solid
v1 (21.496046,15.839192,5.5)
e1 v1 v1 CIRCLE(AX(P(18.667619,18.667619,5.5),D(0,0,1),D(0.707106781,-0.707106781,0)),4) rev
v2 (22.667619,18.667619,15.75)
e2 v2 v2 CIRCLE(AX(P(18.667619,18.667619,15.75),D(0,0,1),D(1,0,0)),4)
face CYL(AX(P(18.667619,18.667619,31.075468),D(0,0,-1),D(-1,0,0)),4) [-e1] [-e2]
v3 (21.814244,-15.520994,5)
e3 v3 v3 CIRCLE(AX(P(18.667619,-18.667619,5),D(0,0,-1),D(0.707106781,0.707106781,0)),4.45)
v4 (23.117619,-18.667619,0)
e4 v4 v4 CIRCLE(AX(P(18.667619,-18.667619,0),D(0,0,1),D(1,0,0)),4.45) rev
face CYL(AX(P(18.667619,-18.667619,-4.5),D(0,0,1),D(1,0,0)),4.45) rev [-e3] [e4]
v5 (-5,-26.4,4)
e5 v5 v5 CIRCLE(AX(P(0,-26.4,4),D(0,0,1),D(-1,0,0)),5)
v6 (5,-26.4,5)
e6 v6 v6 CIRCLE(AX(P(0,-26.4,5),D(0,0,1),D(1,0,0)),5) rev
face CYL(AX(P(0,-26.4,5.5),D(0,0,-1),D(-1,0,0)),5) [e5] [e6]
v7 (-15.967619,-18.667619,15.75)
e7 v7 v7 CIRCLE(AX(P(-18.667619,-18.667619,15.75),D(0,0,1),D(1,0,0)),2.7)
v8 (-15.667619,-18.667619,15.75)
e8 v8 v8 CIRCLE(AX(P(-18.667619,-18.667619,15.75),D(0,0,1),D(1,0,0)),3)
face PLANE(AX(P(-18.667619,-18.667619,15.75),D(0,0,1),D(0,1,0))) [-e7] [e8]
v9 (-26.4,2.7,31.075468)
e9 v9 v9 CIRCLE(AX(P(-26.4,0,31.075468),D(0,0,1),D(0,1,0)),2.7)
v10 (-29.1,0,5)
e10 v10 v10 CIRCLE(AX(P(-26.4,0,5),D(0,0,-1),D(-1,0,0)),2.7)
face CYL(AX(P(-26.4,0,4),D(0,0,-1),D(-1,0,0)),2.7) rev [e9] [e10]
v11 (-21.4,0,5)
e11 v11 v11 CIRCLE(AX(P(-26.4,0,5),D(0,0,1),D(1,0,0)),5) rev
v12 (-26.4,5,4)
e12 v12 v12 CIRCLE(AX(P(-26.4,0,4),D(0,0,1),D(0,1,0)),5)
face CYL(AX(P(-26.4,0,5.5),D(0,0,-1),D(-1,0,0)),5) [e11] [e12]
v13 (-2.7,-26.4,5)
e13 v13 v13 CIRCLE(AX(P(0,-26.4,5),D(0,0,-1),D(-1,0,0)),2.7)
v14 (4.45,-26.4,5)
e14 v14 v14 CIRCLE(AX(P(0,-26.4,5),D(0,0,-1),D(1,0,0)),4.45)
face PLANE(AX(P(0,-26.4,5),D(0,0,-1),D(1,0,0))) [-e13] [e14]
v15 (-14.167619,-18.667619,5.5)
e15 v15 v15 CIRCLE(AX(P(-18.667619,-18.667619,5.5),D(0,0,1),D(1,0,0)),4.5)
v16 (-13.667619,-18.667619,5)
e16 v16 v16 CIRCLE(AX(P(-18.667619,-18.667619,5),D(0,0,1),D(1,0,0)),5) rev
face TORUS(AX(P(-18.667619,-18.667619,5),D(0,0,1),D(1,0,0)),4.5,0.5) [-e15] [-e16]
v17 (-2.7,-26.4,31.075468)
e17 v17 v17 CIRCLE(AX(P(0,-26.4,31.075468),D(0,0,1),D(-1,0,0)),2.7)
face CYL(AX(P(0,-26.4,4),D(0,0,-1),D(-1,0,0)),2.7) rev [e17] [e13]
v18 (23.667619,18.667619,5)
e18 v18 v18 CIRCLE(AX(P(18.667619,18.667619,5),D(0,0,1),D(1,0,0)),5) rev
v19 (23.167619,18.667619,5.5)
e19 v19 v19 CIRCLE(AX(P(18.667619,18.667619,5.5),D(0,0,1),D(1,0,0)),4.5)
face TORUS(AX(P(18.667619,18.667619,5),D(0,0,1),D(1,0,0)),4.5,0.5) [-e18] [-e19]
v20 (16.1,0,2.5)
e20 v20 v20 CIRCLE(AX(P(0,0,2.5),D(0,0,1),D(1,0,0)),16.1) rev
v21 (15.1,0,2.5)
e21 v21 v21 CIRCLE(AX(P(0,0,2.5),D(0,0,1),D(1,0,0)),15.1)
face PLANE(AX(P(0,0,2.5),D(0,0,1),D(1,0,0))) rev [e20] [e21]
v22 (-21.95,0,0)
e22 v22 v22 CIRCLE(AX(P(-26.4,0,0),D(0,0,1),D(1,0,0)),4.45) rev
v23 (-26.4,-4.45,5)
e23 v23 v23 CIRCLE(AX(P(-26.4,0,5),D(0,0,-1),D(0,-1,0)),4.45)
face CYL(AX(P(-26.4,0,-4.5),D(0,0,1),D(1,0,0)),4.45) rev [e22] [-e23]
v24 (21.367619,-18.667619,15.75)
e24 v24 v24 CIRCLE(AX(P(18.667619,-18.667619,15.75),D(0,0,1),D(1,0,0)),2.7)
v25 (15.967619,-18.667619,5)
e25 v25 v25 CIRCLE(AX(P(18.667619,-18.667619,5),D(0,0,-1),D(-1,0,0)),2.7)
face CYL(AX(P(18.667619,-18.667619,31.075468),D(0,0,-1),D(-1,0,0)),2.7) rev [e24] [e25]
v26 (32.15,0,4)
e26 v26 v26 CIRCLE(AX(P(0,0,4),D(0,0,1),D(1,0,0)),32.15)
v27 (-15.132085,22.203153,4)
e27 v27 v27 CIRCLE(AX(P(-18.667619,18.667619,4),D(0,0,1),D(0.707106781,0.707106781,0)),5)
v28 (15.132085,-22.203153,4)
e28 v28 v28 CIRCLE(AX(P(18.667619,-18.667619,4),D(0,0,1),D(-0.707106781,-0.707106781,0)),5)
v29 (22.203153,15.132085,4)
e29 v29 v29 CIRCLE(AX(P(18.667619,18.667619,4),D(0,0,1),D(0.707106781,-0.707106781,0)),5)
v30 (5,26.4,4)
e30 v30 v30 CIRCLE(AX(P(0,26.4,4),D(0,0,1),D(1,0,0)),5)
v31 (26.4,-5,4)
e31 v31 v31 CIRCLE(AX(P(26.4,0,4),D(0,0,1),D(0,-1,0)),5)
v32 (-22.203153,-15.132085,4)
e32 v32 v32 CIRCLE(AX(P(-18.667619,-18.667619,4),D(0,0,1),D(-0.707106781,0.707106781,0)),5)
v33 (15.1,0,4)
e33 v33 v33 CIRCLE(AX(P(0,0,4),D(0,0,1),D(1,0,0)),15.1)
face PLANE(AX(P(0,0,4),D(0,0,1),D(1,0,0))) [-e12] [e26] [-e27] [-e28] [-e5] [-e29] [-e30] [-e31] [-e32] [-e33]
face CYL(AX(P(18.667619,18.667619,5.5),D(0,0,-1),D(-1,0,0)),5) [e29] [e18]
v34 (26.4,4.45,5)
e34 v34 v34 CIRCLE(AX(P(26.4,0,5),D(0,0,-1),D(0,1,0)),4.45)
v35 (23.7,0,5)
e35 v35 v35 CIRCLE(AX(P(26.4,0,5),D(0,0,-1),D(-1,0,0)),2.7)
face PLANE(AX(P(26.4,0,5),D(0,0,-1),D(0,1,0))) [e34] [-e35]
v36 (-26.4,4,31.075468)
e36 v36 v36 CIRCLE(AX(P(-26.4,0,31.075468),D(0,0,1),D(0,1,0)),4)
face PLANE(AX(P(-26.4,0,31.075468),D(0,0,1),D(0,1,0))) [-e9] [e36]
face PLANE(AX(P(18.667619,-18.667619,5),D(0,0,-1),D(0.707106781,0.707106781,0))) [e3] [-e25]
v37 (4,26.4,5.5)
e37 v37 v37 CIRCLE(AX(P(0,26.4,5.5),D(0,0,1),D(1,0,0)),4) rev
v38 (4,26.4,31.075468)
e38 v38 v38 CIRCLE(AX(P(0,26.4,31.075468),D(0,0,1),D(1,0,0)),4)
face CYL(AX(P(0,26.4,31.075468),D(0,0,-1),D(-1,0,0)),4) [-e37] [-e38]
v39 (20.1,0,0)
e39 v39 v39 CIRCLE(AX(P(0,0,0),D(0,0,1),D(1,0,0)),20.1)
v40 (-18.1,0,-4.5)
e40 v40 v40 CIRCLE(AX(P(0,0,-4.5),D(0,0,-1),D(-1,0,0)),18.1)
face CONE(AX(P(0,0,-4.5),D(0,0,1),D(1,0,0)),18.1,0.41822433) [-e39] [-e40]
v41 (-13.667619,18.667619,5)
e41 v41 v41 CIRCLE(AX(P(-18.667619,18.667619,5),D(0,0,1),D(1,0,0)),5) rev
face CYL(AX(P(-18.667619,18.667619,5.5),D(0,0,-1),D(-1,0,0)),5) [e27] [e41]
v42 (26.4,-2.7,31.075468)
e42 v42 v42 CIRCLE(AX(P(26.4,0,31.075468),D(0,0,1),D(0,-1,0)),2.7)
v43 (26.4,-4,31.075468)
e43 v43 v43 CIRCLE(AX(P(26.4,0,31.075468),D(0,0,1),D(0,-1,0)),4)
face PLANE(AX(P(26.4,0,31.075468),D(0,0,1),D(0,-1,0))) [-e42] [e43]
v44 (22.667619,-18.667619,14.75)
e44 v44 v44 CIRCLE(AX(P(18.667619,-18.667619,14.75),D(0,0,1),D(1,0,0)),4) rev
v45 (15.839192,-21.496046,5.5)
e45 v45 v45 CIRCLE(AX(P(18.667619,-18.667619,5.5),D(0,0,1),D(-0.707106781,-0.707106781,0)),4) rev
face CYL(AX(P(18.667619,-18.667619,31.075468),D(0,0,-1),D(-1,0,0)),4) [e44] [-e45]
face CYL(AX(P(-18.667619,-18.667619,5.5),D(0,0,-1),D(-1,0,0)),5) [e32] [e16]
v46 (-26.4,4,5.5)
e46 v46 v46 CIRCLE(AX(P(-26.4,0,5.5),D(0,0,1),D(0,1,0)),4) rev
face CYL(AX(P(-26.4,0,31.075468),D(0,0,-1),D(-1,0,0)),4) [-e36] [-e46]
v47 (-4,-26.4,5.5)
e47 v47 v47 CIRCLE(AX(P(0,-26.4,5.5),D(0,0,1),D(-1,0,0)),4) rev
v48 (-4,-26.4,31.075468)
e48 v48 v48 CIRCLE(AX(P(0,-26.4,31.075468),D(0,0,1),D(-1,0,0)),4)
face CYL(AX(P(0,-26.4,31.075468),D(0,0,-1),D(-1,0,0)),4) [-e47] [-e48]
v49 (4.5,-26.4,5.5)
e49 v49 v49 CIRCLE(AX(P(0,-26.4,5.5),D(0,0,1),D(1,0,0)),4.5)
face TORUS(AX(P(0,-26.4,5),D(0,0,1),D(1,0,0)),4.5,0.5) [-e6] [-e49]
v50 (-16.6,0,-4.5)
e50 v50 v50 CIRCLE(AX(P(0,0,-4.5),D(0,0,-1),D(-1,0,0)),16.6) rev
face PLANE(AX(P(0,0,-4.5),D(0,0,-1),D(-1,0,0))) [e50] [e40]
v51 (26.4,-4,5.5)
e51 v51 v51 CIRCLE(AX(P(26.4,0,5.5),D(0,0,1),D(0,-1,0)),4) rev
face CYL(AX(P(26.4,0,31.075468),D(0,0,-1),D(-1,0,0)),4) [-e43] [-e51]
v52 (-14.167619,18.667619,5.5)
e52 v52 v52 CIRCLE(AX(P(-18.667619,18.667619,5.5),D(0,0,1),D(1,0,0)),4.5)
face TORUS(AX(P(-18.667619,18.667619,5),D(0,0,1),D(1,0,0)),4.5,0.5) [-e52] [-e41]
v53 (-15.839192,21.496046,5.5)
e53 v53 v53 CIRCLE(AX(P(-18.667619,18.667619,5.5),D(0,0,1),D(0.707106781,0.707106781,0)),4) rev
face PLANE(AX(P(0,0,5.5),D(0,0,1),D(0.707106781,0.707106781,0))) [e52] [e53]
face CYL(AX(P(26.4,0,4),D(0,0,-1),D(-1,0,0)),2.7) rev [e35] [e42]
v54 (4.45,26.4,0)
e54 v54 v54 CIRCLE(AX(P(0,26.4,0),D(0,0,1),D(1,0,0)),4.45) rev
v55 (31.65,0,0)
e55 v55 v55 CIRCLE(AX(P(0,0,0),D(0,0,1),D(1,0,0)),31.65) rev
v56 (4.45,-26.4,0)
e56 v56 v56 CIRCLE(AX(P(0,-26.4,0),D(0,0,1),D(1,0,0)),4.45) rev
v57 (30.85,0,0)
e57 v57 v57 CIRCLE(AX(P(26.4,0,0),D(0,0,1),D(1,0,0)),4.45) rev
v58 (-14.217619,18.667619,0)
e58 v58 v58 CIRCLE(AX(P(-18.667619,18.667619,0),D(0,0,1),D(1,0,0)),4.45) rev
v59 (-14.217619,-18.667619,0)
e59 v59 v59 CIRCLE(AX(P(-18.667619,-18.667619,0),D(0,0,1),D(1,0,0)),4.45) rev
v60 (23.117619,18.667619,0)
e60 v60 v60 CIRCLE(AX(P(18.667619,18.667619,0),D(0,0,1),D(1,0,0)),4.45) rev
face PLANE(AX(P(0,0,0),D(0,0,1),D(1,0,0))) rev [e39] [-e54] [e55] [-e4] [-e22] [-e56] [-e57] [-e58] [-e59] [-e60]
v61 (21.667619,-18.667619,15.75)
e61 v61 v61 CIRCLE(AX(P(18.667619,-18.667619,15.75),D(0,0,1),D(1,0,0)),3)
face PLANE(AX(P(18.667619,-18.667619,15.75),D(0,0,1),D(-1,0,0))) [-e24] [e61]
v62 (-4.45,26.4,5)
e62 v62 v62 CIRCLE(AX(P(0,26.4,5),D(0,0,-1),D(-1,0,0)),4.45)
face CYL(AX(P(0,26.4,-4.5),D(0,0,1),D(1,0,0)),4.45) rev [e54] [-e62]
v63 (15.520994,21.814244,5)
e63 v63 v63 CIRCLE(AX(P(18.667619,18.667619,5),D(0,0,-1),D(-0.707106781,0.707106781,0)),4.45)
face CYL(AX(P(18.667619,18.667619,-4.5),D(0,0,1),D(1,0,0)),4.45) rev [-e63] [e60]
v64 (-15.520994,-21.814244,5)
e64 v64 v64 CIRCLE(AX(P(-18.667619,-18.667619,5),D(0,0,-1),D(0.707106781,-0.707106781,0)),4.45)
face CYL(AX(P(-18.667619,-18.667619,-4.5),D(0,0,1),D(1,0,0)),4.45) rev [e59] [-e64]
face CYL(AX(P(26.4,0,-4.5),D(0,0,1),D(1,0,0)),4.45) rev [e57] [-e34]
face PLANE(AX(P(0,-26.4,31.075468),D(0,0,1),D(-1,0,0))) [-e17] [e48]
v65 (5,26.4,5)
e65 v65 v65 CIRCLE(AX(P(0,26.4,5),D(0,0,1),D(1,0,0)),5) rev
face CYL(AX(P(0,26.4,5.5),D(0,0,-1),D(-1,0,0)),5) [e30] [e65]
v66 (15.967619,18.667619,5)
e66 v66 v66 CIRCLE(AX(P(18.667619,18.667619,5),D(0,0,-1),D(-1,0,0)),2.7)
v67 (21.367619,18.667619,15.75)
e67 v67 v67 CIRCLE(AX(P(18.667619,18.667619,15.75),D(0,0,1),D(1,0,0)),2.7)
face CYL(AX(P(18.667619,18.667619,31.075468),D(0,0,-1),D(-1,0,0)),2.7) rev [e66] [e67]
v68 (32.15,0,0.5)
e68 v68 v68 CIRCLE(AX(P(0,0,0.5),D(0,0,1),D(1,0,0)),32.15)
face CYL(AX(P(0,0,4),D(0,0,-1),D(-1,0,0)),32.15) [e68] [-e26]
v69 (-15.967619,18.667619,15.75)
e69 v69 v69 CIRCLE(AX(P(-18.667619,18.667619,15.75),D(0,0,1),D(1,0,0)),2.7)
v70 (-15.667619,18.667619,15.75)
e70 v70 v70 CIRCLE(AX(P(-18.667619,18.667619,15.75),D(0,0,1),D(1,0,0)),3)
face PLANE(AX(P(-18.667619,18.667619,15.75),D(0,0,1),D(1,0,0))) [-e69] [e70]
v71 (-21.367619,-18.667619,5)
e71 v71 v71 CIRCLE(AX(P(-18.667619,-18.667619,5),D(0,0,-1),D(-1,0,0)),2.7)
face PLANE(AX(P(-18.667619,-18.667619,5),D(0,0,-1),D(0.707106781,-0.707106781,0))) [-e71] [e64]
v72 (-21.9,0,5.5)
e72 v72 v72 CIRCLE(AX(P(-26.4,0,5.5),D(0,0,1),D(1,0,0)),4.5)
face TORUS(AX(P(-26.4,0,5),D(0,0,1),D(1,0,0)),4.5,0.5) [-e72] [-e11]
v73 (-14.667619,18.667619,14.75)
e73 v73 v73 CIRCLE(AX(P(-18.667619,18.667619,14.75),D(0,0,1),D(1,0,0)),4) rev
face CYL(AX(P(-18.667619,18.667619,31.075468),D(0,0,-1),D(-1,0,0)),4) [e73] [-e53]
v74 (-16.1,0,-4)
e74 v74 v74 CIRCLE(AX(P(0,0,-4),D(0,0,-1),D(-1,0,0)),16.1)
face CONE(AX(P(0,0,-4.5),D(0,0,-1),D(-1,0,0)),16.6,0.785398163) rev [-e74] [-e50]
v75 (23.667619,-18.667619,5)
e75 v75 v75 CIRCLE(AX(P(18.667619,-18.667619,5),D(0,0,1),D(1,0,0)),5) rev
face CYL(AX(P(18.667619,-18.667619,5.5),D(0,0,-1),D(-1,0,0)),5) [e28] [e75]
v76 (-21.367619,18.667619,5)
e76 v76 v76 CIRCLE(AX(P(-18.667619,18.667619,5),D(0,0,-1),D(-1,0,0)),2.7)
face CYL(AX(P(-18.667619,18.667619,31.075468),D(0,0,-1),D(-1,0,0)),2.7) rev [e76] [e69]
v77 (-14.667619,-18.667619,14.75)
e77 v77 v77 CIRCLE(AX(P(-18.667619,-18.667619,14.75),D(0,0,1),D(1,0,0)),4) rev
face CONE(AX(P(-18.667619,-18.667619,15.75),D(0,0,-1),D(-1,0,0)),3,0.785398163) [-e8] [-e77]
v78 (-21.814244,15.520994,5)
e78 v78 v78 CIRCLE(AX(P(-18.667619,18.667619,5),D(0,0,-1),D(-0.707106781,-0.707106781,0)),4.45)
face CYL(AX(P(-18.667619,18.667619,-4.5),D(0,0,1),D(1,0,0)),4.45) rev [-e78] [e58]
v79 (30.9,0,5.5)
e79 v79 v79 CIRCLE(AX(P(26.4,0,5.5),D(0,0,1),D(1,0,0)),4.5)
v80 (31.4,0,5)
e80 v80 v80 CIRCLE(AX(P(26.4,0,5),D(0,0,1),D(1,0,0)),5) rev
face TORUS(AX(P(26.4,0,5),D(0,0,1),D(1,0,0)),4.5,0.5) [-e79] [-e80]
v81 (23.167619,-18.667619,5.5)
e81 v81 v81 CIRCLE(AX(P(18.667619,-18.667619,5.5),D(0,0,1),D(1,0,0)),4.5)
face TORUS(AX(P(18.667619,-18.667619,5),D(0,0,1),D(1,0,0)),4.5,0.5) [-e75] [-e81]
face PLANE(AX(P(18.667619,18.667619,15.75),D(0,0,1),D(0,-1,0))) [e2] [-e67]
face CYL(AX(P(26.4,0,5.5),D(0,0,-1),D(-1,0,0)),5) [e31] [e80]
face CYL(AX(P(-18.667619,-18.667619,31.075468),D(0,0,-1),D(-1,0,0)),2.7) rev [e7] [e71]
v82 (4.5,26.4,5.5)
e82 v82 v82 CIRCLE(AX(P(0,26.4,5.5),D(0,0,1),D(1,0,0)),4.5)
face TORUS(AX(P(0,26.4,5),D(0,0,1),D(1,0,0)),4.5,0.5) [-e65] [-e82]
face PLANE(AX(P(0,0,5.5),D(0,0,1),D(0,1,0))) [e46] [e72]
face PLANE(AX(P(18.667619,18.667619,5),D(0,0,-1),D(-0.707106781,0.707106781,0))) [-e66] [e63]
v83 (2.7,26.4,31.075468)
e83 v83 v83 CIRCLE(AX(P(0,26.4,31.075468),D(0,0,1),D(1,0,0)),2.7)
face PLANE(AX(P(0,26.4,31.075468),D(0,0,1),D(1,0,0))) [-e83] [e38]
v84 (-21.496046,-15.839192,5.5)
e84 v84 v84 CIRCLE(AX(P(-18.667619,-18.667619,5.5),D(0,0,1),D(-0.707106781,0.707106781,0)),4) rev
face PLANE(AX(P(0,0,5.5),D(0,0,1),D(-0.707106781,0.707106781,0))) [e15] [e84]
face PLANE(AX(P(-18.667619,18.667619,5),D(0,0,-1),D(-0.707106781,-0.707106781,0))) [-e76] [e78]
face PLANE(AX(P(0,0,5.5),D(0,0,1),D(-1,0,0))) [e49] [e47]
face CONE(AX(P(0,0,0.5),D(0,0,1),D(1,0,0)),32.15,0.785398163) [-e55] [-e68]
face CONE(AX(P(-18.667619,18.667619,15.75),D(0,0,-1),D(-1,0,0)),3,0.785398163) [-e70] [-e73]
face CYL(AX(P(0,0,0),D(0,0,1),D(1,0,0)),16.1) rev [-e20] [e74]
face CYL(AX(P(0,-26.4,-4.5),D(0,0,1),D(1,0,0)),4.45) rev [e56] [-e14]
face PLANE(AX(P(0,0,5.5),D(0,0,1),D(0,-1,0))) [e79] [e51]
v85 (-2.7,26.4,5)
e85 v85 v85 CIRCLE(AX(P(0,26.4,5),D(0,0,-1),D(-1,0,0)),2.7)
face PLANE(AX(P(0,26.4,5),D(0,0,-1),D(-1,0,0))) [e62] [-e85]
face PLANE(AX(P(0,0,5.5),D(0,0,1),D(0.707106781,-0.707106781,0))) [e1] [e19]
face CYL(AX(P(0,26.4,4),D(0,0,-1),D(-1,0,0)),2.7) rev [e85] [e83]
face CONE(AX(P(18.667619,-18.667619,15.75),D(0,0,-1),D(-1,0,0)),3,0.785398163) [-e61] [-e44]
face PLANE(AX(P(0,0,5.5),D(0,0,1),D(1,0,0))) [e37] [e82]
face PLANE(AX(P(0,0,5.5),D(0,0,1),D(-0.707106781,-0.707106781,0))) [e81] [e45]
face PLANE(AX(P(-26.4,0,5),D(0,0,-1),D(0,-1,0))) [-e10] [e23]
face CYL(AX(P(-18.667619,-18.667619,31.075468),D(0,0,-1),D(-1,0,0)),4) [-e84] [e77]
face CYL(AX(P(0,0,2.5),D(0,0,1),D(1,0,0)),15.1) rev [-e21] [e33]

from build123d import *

# Parameters (mm, degrees)
SKETCH1_R                = 32.15
SKETCH1_R_2              = 2.7
BOSS_EXTRUDE1_DEPTH      = 4
SKETCH2_R                = 4
SKETCH2_R_2              = 2.7
BOSS_EXTRUDE2_DEPTH      = 27.07546845
SKETCH3_R                = 5
SKETCH3_R_2              = 4
BOSS_EXTRUDE3_DEPTH      = 1.5
FILLET2_R                = 0.5
CIRPATTERN1_COUNT        = 8
FILLET2_OF_CIRPATTERN1_R = 0.5
CHAMFER1_SIZE            = 0.5
SKETCH9_R                = 8
CUT_EXTRUDE4_DEPTH       = 53.918106464
BOSS_EXTRUDE7_START      = -6.5
SKETCH10_R               = 8
SKETCH10_R_2             = 6.5
BOSS_EXTRUDE7_DEPTH      = 6.5
CUT_EXTRUDE5_DEPTH       = 53.918106464
CUT_EXTRUDE5_DEPTH_BACK  = 53.918106464
SKETCH14_R               = 16.1
SKETCH15_R               = 16.1
SKETCH15_R_2             = 15.1
BOSS_EXTRUDE8_DEPTH      = 1.5
SKETCH16_R               = 18.1
SKETCH16_R_2             = 16.1
BOSS_EXTRUDE9_DEPTH      = 4.5
CHAMFER3_SIZE2           = 4.5
CHAMFER3_SIZE            = 2
CUT_EXTRUDE3_START       = -5
SKETCH7_R                = 4.45
CUT_EXTRUDE3_DEPTH       = 61.072041358
CIRPATTERN2_COUNT        = 8
CHAMFER4_SIZE            = 0.5
SKETCH17_R               = 6.596186261
CUT_EXTRUDE6_DEPTH       = 15.32546845
CIRPATTERN3_COUNT        = 4
CHAMFER5_SIZE            = 1


with BuildPart() as part:
    # Sketch1 → Boss-Extrude1 (new body)
    with BuildSketch(Plane.XY):
        Circle(SKETCH1_R)
        with Locations((0, 26.4)):
            Circle(SKETCH1_R_2, mode=Mode.SUBTRACT)
        with Locations((26.4, 0)):
            Circle(SKETCH1_R_2, mode=Mode.SUBTRACT)
        with Locations((0, -26.4)):
            Circle(SKETCH1_R_2, mode=Mode.SUBTRACT)
        with Locations((-26.4, 0)):
            Circle(SKETCH1_R_2, mode=Mode.SUBTRACT)
    extrude(amount=BOSS_EXTRUDE1_DEPTH)

    # Sketch2 → Boss-Extrude2 (add)
    with BuildSketch(Plane.XY.offset(4)):
        with Locations((0, 26.4)):
            Circle(SKETCH2_R)
        with Locations((0, 26.4)):
            Circle(SKETCH2_R_2, mode=Mode.SUBTRACT)
    boss_extrude2 = extrude(amount=BOSS_EXTRUDE2_DEPTH)

    # Sketch3 → Boss-Extrude3 (add)
    with BuildSketch(Plane.XY.offset(4)):
        with Locations((0, 26.4)):
            Circle(SKETCH3_R)
        with Locations((0, 26.4)):
            Circle(SKETCH3_R_2, mode=Mode.SUBTRACT)
    boss_extrude3 = extrude(amount=BOSS_EXTRUDE3_DEPTH)

    # Fillet2
    fillet2_edges = [part.edges().sort_by_distance(p)[0] for p in [
        (-5, 26.4, 5.5),
    ]]
    fillet(fillet2_edges, radius=FILLET2_R)

    # CirPattern1: Boss-Extrude2, Boss-Extrude3 ×8 about axis
    cirpattern1_axis = Axis((0, 0, 0), (0, 0, 1))
    add([boss_extrude2.rotate(cirpattern1_axis, i * 360 / CIRPATTERN1_COUNT) for i in range(1, CIRPATTERN1_COUNT)])
    add([boss_extrude3.rotate(cirpattern1_axis, i * 360 / CIRPATTERN1_COUNT) for i in range(1, CIRPATTERN1_COUNT)])

    # Fillet2 of CirPattern1
    fillet2_of_cirpattern1_edges = [part.edges().sort_by_distance(p)[0] for p in [
        (-22.203152929, 15.132085117, 5.5),
        (-26.4, -5, 5.5),
        (-15.132085117, -22.203152929, 5.5),
        (5, -26.4, 5.5),
        (22.203152929, -15.132085117, 5.5),
        (26.4, 5, 5.5),
        (15.132085117, 22.203152929, 5.5),
    ]]
    fillet(fillet2_of_cirpattern1_edges, radius=FILLET2_OF_CIRPATTERN1_R)

    # Chamfer1
    chamfer1_edges = [part.edges().sort_by_distance(p)[0] for p in [
        (-32.15, 0, 0),
    ]]
    chamfer(chamfer1_edges, length=CHAMFER1_SIZE)

    # Sketch9 → Cut-Extrude4 (cut, through all)
    with BuildSketch(Plane.XY.offset(4)):
        Circle(SKETCH9_R)
    extrude(amount=-CUT_EXTRUDE4_DEPTH, mode=Mode.SUBTRACT)

    # Sketch10 → Boss-Extrude7 (add)
    with BuildSketch(Plane(origin=(0, 0, 0), x_dir=(-1, 0, 0), z_dir=(0, 0, -1)).offset(BOSS_EXTRUDE7_START)):
        Circle(SKETCH10_R)
        Circle(SKETCH10_R_2, mode=Mode.SUBTRACT)
    extrude(amount=BOSS_EXTRUDE7_DEPTH)

    # Sketch14 → Cut-Extrude5 (cut, two sides: drawn at the far end of the back side and taken through both)
    with BuildSketch(Plane.XY.offset(4).offset(-CUT_EXTRUDE5_DEPTH_BACK)):
        Circle(SKETCH14_R)
    extrude(amount=CUT_EXTRUDE5_DEPTH + CUT_EXTRUDE5_DEPTH_BACK, mode=Mode.SUBTRACT)

    # Sketch15 → Boss-Extrude8 (add)
    with BuildSketch(Plane.XY.offset(4)):
        Circle(SKETCH15_R)
        Circle(SKETCH15_R_2, mode=Mode.SUBTRACT)
    extrude(amount=-BOSS_EXTRUDE8_DEPTH)

    # Sketch16 → Boss-Extrude9 (add)
    with BuildSketch(Plane(origin=(0, 0, 0), x_dir=(-1, 0, 0), z_dir=(0, 0, -1))):
        with Locations(Location((0, 0, 0), (0, 0, 180))):
            Circle(SKETCH16_R)
        with Locations(Location((0, 0, 0), (0, 0, 180))):
            Circle(SKETCH16_R_2, mode=Mode.SUBTRACT)
    extrude(amount=BOSS_EXTRUDE9_DEPTH)

    # Chamfer3
    chamfer3_edges = [part.edges().sort_by_distance(p)[0] for p in [
        (-18.1, 0, 0),
    ]]
    chamfer3_side = [part.faces().sort_by_distance(p)[0] for p in [
        (-18.14, 0, 0),
    ]]
    chamfer(chamfer3_edges, length=CHAMFER3_SIZE - 0.0001, length2=CHAMFER3_SIZE2 - 0.0001, reference=chamfer3_side[0])  # a hair under: the kernel refuses the full size

    # Sketch7 → Cut-Extrude3 (cut)
    with BuildSketch(Plane(origin=(0, 0, 0), x_dir=(-1, 0, 0), z_dir=(0, 0, -1)).offset(CUT_EXTRUDE3_START)):
        with Locations(Location((0, 26.4, 0), (0, 0, 180))):
            Circle(SKETCH7_R)
    cut_extrude3 = extrude(amount=CUT_EXTRUDE3_DEPTH, mode=Mode.SUBTRACT)

    # CirPattern2: Cut-Extrude3 ×8 about axis
    cirpattern2_axis = Axis((0, 0, 0), (0, 0, 1))
    for i in range(1, CIRPATTERN2_COUNT):
        add(cut_extrude3.rotate(cirpattern2_axis, i * 360 / CIRPATTERN2_COUNT), mode=Mode.SUBTRACT)

    # Chamfer4
    chamfer4_edges = [part.edges().sort_by_distance(p)[0] for p in [
        (-16.1, 0, -4.5),
    ]]
    chamfer(chamfer4_edges, length=CHAMFER4_SIZE)

    # Sketch17 → Cut-Extrude6 (cut)
    with BuildSketch(Plane.XY.offset(31.07546845)):
        with Locations((-18.667619023, 18.667619023)):
            Circle(SKETCH17_R)
    cut_extrude6 = extrude(amount=-CUT_EXTRUDE6_DEPTH, mode=Mode.SUBTRACT)

    # CirPattern3: Cut-Extrude6 ×4 about axis
    cirpattern3_axis = Axis((0, 0, 0), (0, 0, 1))
    for i in range(1, CIRPATTERN3_COUNT):
        add(cut_extrude6.rotate(cirpattern3_axis, i * 360 / CIRPATTERN3_COUNT), mode=Mode.SUBTRACT)

    # Chamfer5
    chamfer5_edges = [part.edges().sort_by_distance(p)[0] for p in [
        (-21.496046148, 15.839191899, 15.75),
        (-15.839191899, -21.496046148, 15.75),
        (21.496046148, -15.839191899, 15.75),
    ]]
    chamfer(chamfer5_edges, length=CHAMFER5_SIZE)


solid = part.part
